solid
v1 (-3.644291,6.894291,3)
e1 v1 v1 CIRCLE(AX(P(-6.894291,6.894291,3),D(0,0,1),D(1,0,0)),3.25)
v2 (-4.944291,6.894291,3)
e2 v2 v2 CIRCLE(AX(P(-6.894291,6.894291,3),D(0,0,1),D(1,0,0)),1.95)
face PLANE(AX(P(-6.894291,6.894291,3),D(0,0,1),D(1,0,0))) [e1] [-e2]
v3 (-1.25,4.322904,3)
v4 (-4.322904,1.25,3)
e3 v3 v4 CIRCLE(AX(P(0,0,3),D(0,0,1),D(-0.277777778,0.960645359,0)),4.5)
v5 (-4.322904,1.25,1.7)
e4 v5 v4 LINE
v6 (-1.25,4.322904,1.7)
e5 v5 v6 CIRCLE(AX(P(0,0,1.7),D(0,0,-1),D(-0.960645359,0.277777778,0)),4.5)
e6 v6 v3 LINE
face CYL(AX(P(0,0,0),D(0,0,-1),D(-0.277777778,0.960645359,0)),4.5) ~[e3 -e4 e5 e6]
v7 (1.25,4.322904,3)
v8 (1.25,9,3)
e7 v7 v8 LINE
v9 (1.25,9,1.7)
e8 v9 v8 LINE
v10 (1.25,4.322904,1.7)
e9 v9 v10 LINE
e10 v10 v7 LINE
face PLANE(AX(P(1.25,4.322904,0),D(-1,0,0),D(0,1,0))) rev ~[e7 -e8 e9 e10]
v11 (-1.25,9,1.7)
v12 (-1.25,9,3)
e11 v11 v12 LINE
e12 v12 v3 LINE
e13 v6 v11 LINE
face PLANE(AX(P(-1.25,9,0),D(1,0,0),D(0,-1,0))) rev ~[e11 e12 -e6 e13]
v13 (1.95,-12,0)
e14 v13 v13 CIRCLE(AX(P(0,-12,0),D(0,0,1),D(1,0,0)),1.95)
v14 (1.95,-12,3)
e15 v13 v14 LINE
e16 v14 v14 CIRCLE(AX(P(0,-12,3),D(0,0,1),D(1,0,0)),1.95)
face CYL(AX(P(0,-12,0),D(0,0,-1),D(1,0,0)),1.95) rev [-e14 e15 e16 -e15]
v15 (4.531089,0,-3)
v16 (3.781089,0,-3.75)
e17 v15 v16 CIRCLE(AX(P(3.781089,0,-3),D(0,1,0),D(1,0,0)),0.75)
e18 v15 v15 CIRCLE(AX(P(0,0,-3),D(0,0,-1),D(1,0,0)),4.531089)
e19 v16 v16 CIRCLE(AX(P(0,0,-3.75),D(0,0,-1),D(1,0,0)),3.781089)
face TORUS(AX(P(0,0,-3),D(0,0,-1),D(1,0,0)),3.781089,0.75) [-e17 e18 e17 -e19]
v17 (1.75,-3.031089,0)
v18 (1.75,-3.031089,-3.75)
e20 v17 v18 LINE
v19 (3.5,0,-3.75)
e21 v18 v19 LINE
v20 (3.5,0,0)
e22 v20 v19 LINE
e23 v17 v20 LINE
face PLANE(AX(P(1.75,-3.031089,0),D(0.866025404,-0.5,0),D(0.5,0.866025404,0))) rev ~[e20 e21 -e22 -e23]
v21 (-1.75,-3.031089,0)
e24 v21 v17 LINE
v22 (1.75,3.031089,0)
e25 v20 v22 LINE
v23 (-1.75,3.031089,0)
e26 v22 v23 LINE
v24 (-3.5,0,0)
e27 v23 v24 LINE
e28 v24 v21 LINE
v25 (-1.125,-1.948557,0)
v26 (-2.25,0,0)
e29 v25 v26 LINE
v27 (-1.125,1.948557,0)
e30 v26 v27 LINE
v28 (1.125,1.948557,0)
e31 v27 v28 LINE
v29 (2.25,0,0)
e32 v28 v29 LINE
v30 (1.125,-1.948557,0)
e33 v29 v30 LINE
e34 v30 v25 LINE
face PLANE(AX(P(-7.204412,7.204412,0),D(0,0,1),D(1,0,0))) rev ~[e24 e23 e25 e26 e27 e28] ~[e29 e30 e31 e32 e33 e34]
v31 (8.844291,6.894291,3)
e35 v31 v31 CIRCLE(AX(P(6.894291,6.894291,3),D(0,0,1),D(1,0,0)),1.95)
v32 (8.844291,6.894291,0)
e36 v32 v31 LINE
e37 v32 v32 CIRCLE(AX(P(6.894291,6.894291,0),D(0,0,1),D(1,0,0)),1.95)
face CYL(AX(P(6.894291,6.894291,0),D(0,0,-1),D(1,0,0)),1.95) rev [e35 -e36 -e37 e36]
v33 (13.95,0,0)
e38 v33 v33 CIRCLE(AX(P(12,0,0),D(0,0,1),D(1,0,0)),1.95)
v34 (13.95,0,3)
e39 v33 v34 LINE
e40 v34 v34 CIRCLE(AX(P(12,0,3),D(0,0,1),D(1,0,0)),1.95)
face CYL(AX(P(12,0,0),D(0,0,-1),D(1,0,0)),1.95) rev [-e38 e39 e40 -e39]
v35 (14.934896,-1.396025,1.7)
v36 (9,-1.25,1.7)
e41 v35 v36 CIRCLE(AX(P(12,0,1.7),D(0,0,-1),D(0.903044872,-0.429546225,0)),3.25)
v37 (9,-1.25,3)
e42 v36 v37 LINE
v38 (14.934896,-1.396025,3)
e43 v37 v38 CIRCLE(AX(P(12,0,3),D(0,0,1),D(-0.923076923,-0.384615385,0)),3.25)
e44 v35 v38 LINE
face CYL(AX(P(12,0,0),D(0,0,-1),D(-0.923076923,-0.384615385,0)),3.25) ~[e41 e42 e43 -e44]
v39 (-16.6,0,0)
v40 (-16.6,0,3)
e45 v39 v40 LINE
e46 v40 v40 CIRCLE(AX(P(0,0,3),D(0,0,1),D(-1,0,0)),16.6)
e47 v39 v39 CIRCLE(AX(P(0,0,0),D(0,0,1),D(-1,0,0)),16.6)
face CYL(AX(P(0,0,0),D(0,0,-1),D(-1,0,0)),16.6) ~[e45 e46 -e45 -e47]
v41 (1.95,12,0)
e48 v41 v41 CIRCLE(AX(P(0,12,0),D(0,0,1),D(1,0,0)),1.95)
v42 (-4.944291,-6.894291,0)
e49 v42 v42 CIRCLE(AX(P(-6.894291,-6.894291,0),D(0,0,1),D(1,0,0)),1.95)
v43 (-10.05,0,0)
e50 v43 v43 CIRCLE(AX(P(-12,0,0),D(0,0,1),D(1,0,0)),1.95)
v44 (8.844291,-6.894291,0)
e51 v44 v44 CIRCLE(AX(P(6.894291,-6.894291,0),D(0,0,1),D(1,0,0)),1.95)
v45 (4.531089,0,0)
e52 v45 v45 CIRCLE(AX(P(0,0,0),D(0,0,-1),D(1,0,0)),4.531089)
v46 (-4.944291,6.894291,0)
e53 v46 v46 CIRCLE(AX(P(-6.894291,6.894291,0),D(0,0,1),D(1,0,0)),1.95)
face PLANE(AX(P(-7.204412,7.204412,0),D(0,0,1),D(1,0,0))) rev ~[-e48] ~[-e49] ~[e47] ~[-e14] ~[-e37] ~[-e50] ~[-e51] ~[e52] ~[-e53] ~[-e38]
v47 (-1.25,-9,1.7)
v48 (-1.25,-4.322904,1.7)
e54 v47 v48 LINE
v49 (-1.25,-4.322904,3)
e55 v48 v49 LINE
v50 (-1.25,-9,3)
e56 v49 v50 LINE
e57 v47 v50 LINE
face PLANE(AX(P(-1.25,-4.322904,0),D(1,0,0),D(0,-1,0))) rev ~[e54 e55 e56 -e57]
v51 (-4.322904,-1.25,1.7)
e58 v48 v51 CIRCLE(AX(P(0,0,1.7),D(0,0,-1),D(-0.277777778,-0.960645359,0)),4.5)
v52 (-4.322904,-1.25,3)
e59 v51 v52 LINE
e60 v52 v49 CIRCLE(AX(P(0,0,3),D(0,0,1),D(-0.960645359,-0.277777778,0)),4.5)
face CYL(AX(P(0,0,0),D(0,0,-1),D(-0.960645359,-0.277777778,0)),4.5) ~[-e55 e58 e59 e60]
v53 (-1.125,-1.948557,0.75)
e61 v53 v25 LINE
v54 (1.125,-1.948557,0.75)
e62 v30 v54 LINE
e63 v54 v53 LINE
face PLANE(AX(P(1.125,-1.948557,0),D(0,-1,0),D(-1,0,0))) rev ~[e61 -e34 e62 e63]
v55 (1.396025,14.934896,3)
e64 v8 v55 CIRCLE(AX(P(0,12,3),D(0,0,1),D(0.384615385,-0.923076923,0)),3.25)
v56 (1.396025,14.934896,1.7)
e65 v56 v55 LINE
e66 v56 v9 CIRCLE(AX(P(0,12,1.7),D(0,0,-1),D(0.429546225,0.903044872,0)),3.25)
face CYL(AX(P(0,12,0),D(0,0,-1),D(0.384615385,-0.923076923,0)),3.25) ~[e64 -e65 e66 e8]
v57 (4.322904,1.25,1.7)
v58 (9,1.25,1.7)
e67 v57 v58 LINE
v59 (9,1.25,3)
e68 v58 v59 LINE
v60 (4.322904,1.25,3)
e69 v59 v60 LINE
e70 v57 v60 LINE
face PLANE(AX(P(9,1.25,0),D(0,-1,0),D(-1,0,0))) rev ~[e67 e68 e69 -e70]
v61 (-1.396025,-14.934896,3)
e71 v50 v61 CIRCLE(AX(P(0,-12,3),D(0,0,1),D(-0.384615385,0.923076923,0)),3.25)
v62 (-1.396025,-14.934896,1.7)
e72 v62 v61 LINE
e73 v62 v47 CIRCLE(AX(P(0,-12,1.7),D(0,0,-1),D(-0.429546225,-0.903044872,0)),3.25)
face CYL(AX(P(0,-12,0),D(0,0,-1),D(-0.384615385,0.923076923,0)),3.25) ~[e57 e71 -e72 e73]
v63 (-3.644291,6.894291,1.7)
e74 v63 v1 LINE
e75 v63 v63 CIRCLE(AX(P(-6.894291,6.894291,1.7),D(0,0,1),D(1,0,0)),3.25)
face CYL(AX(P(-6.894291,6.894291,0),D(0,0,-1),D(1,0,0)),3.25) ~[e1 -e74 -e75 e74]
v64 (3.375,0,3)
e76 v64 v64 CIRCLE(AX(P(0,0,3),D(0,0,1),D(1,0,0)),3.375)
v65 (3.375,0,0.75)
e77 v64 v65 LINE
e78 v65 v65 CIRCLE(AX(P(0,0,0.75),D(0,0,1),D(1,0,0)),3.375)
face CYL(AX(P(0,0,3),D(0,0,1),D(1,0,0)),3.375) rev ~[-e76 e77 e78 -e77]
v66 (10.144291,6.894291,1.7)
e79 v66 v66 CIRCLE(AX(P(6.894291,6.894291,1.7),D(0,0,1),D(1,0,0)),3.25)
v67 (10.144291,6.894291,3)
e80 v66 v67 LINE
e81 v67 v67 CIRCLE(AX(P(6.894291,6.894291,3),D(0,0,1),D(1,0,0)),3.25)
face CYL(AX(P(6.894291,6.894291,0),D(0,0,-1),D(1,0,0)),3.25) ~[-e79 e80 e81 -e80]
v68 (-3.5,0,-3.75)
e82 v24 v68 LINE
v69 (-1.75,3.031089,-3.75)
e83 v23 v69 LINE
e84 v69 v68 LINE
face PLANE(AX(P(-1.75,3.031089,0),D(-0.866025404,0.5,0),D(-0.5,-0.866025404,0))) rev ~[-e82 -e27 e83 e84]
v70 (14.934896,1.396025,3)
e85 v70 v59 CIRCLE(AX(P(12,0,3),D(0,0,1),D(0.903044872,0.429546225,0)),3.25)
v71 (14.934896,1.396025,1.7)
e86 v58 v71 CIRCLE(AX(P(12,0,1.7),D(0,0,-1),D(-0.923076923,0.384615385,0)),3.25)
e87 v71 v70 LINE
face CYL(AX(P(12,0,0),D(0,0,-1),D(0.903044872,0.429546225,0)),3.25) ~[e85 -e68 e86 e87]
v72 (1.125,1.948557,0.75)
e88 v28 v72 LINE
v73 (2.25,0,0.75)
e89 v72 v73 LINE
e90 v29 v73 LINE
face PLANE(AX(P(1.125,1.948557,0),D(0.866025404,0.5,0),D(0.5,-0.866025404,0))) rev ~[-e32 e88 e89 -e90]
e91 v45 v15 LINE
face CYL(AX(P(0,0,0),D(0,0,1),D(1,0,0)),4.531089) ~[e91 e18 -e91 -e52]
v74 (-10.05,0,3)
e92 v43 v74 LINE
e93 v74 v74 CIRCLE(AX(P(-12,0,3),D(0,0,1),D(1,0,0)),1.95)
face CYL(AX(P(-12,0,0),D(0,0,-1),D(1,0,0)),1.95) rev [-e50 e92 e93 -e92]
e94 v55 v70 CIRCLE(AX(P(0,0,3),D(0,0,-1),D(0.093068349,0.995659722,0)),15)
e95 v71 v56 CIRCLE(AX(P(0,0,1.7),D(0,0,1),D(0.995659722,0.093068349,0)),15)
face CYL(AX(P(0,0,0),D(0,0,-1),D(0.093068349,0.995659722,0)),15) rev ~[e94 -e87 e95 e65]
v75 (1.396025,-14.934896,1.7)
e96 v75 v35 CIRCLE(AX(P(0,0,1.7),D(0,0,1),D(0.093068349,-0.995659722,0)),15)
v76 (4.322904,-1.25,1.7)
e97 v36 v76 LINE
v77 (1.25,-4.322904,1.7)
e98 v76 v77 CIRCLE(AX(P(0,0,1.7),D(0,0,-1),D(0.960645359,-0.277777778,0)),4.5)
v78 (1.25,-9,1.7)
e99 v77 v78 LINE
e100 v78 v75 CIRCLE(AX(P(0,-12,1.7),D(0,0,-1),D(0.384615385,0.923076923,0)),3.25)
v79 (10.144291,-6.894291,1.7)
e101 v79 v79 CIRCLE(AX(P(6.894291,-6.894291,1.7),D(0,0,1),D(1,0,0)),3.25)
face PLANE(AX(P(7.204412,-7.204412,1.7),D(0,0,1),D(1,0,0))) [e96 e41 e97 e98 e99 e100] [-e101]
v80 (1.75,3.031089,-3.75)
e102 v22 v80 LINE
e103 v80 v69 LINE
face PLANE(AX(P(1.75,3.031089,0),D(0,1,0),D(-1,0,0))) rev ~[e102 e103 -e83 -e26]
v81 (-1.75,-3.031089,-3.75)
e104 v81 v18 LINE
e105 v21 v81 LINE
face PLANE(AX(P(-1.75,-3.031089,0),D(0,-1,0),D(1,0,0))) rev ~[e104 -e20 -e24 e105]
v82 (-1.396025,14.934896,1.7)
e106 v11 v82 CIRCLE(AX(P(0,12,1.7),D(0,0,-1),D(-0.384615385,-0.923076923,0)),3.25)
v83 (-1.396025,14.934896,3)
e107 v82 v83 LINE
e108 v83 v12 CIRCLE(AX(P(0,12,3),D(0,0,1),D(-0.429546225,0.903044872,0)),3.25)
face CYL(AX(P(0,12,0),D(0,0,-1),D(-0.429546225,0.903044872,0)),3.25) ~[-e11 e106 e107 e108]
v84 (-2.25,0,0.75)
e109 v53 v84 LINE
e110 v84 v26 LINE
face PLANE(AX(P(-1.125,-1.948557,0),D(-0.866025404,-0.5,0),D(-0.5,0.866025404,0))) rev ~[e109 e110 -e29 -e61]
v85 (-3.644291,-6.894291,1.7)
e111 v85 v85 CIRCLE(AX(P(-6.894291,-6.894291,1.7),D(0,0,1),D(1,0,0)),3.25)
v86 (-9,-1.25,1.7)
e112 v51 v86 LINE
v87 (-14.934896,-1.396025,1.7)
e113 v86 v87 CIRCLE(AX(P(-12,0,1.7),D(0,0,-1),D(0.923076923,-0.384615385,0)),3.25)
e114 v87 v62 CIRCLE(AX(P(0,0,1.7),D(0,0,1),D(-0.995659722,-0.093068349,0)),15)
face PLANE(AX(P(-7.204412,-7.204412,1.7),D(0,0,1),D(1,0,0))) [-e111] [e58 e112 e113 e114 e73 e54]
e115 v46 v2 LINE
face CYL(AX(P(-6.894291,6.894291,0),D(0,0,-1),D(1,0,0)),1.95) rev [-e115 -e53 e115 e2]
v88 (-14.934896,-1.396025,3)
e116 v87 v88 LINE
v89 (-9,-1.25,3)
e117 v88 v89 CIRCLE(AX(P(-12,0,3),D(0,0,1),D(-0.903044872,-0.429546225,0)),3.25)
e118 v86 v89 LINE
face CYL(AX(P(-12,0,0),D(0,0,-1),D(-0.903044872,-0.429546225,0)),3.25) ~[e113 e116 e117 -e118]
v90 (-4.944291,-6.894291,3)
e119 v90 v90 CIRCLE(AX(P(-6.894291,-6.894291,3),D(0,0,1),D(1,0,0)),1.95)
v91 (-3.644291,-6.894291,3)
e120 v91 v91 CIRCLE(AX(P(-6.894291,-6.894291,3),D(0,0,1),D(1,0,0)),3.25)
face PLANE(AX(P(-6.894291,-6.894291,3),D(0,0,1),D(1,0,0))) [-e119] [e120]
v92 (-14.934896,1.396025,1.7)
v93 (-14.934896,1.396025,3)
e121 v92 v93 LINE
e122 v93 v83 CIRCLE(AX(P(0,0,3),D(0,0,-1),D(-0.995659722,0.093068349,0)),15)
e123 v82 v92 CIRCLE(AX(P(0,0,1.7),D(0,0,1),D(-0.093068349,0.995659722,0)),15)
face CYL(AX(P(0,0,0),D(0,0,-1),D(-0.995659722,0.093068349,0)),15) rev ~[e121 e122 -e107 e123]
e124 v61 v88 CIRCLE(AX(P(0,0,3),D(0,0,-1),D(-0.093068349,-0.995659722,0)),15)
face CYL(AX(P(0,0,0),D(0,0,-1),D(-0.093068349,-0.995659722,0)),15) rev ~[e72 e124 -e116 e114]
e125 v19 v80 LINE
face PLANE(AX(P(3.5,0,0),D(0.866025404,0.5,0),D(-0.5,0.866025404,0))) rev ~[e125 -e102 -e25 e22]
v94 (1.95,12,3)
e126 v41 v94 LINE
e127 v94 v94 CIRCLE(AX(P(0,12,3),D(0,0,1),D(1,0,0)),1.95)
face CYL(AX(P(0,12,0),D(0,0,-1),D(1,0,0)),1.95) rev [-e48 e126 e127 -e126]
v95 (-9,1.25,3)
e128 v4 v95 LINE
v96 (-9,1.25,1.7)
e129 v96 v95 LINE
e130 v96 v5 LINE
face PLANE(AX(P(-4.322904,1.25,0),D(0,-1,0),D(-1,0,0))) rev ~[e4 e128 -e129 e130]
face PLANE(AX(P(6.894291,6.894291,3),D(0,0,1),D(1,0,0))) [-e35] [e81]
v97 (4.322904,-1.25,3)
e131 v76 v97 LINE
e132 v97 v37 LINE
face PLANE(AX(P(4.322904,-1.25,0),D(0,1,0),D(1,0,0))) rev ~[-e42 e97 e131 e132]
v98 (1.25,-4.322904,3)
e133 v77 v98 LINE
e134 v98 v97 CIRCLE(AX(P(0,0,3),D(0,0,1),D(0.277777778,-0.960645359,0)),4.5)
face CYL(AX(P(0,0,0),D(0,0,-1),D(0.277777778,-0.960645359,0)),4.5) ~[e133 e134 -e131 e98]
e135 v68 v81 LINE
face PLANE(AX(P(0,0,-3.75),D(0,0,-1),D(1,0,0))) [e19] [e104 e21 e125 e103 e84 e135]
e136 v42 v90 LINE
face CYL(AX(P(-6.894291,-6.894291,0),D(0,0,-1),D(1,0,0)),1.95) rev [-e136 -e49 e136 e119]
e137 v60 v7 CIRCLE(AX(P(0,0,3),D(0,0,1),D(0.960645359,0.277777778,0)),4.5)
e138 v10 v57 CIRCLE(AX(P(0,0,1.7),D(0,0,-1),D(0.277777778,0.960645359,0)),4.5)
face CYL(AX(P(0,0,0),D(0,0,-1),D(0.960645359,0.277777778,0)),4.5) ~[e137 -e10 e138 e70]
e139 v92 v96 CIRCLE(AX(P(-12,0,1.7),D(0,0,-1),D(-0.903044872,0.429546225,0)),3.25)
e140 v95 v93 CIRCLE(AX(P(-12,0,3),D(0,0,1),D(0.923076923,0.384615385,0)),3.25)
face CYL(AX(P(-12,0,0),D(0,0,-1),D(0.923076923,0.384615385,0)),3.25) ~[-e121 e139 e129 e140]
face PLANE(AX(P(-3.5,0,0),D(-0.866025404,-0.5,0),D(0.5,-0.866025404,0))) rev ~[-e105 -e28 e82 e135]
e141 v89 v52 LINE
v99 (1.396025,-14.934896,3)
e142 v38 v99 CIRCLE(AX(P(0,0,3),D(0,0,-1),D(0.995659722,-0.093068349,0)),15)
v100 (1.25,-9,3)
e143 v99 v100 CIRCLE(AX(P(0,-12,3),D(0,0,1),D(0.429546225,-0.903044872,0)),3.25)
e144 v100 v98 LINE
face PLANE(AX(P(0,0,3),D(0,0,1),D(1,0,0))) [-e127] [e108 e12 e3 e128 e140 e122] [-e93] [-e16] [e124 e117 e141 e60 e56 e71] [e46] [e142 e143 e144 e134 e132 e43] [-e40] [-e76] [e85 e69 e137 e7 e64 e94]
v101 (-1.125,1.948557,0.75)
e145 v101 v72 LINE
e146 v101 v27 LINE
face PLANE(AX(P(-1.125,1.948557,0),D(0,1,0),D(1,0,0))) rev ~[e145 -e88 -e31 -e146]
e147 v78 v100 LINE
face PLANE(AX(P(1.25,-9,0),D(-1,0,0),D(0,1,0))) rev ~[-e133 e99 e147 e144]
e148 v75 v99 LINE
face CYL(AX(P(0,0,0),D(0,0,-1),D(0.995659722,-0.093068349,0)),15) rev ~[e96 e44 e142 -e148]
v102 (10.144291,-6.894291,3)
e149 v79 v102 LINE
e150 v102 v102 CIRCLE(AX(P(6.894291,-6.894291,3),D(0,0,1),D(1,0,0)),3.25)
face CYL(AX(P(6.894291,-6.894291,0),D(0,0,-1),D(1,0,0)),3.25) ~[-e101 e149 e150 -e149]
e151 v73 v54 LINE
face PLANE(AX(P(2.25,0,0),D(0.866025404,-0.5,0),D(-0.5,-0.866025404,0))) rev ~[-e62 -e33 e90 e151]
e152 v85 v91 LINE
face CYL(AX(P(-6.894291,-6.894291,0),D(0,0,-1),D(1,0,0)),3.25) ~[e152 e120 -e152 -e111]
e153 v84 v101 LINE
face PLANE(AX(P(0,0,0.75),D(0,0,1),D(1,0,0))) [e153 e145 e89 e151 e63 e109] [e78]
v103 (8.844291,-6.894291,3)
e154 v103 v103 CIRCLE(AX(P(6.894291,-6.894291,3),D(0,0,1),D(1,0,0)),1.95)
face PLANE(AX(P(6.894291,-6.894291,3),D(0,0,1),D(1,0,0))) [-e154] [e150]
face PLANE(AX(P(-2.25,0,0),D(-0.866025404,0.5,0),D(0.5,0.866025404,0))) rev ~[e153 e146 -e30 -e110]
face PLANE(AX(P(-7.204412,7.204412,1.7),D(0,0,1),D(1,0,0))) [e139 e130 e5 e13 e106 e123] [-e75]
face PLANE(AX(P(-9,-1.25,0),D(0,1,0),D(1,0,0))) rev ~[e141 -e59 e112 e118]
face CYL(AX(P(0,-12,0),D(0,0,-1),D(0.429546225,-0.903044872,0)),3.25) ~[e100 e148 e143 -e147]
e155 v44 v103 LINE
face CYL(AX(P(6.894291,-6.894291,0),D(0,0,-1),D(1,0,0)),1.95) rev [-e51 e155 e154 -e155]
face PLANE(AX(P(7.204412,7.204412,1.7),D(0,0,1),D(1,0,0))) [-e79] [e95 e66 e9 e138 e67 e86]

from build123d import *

# Parameters (mm, degrees)
F0_R     = 3.375
F0_R_2   = 1.95
F1_DEPTH = 3
F0_R_3   = 3.25
F2_DEPTH = 1.7
F3_DEPTH = 3
F4_R     = 3.375
F5_DEPTH = 2.25
F6_R     = 4.5310889132
F7_DEPTH = 3.75
F8_R     = 0.75


# Not quite as in the source:
# - a feature names something its author has since deleted; it is built from what else it names


with BuildPart() as f1:
    # F0 (on Top) → F1 (new body)
    with BuildSketch(Plane.XY):
        with BuildLine():
            ThreePointArc((16.6, 0), (0, 16.6), (-16.6, 0))
            ThreePointArc((-16.6, 0), (0, -16.6), (16.6, 0))
        make_face()
        with BuildLine():
            ThreePointArc((14.9348958333, 1.3960252317), (14.9837151184, 0.698771243), (15, 0))
            ThreePointArc((15, 0), (14.9837151184, -0.698771243), (14.9348958333, -1.3960252317))
            ThreePointArc((14.9348958333, -1.3960252317), (10.6066017178, -10.6066017178), (1.3960252317, -14.9348958333))
            ThreePointArc((1.3960252317, -14.9348958333), (0, -15), (-1.3960252317, -14.9348958333))
            ThreePointArc((-1.3960252317, -14.9348958333), (-10.6066017178, -10.6066017178), (-14.9348958333, -1.3960252317))
            ThreePointArc((-14.9348958333, -1.3960252317), (-14.9837151184, -0.698771243), (-15, 0))
            ThreePointArc((-15, 0), (-14.9837151184, 0.698771243), (-14.9348958333, 1.3960252317))
            ThreePointArc((-14.9348958333, 1.3960252317), (-10.6066017178, 10.6066017178), (-1.3960252317, 14.9348958333))
            ThreePointArc((-1.3960252317, 14.9348958333), (0, 15), (1.3960252317, 14.9348958333))
            ThreePointArc((1.3960252317, 14.9348958333), (10.6066017178, 10.6066017178), (14.9348958333, 1.3960252317))
        make_face(mode=Mode.SUBTRACT)
        with BuildLine():
            ThreePointArc((1.25, -4.3229041164), (3.1819805153, -3.1819805153), (4.3229041164, -1.25))
            ThreePointArc((4.3229041164, -1.25), (4.4555060613, -0.6312414261), (4.5, 0))
            ThreePointArc((4.5, 0), (4.4555060613, 0.6312414261), (4.3229041164, 1.25))
            ThreePointArc((4.3229041164, 1.25), (3.1819805153, 3.1819805153), (1.25, 4.3229041164))
            ThreePointArc((1.25, 4.3229041164), (0, 4.5), (-1.25, 4.3229041164))
            ThreePointArc((-1.25, 4.3229041164), (-3.1819805153, 3.1819805153), (-4.3229041164, 1.25))
            ThreePointArc((-4.3229041164, 1.25), (-4.5, 0), (-4.3229041164, -1.25))
            ThreePointArc((-4.3229041164, -1.25), (-3.1819805153, -3.1819805153), (-1.25, -4.3229041164))
            ThreePointArc((-1.25, -4.3229041164), (0, -4.5), (1.25, -4.3229041164))
        make_face()
        Circle(F0_R, mode=Mode.SUBTRACT)
        Circle(F0_R)
        Polygon((-2.25, 0), (-1.125, 1.9485571585), (1.125, 1.9485571585), (2.25, 0), (1.125, -1.9485571585), (-1.125, -1.9485571585), align=None, mode=Mode.SUBTRACT)
        with BuildLine():
            ThreePointArc((14.9348958333, -1.3960252317), (14.9837151184, -0.698771243), (15, 0))
            ThreePointArc((15, 0), (14.9837151184, 0.698771243), (14.9348958333, 1.3960252317))
            ThreePointArc((14.9348958333, 1.3960252317), (11.9200595209, 3.2490167004), (9, 1.25))
            ThreePointArc((9, 1.25), (8.75, 0), (9, -1.25))
            ThreePointArc((9, -1.25), (11.9200595209, -3.2490167004), (14.9348958333, -1.3960252317))
        make_face()
        with Locations((12, 0)):
            Circle(F0_R_2, mode=Mode.SUBTRACT)
        with BuildLine():
            ThreePointArc((1.25, 9), (3.2490167004, 11.9200595209), (1.3960252317, 14.9348958333))
            ThreePointArc((1.3960252317, 14.9348958333), (0, 15), (-1.3960252317, 14.9348958333))
            ThreePointArc((-1.3960252317, 14.9348958333), (-3.2490167004, 11.9200595209), (-1.25, 9))
            ThreePointArc((-1.25, 9), (0, 8.75), (1.25, 9))
        make_face()
        with Locations((0, 12)):
            Circle(F0_R_2, mode=Mode.SUBTRACT)
        with BuildLine():
            ThreePointArc((-1.3960252317, -14.9348958333), (0, -15), (1.3960252317, -14.9348958333))
            ThreePointArc((1.3960252317, -14.9348958333), (3.2490167004, -11.9200595209), (1.25, -9))
            ThreePointArc((1.25, -9), (0, -8.75), (-1.25, -9))
            ThreePointArc((-1.25, -9), (-3.2490167004, -11.9200595209), (-1.3960252317, -14.9348958333))
        make_face()
        with Locations((0, -12)):
            Circle(F0_R_2, mode=Mode.SUBTRACT)
        with BuildLine():
            ThreePointArc((-9, 1.25), (-11.9200595209, 3.2490167004), (-14.9348958333, 1.3960252317))
            ThreePointArc((-14.9348958333, 1.3960252317), (-14.9837151184, 0.698771243), (-15, 0))
            ThreePointArc((-15, 0), (-14.9837151184, -0.698771243), (-14.9348958333, -1.3960252317))
            ThreePointArc((-14.9348958333, -1.3960252317), (-11.9200595209, -3.2490167004), (-9, -1.25))
            ThreePointArc((-9, -1.25), (-8.75, 0), (-9, 1.25))
        make_face()
        with Locations((-12, 0)):
            Circle(F0_R_2, mode=Mode.SUBTRACT)
        with BuildLine():
            ThreePointArc((9, -1.25), (8.75, 0), (9, 1.25))
            Line((9, 1.25), (6, 1.25))
            Line((6, 1.25), (4.3229041164, 1.25))
            ThreePointArc((4.3229041164, 1.25), (4.4555060613, 0.6312414261), (4.5, 0))
            ThreePointArc((4.5, 0), (4.4555060613, -0.6312414261), (4.3229041164, -1.25))
            Line((4.3229041164, -1.25), (9, -1.25))
        make_face()
        with BuildLine():
            Line((1.25, 4.3229041164), (1.25, 9))
            ThreePointArc((1.25, 9), (0, 8.75), (-1.25, 9))
            Line((-1.25, 9), (-1.25, 6))
            Line((-1.25, 6), (-1.25, 4.3229041164))
            ThreePointArc((-1.25, 4.3229041164), (0, 4.5), (1.25, 4.3229041164))
        make_face()
        with BuildLine():
            ThreePointArc((-1.25, -9), (0, -8.75), (1.25, -9))
            Line((1.25, -9), (1.25, -6))
            Line((1.25, -6), (1.25, -4.3229041164))
            ThreePointArc((1.25, -4.3229041164), (0, -4.5), (-1.25, -4.3229041164))
            Line((-1.25, -4.3229041164), (-1.25, -9))
        make_face()
        with BuildLine():
            Line((-4.3229041164, 1.25), (-9, 1.25))
            ThreePointArc((-9, 1.25), (-8.75, 0), (-9, -1.25))
            Line((-9, -1.25), (-6, -1.25))
            Line((-6, -1.25), (-4.3229041164, -1.25))
            ThreePointArc((-4.3229041164, -1.25), (-4.5, 0), (-4.3229041164, 1.25))
        make_face()
    extrude(amount=F1_DEPTH)



with BuildPart() as f1b:
    # F0 (on Top) → F1, piece 2 (new body)
    with BuildSketch(Plane.XY):
        with Locations((6.8942911166, 6.8942911166)):
            Circle(F0_R_3)
        with Locations((6.8942911166, 6.8942911166)):
            Circle(F0_R_2, mode=Mode.SUBTRACT)
    extrude(amount=F1_DEPTH)


with BuildPart() as f1c:
    # F0 (on Top) → F1, piece 3 (new body)
    with BuildSketch(Plane.XY):
        with Locations((-6.8942911166, 6.8942911166)):
            Circle(F0_R_3)
        with Locations((-6.8942911166, 6.8942911166)):
            Circle(F0_R_2, mode=Mode.SUBTRACT)
    extrude(amount=F1_DEPTH)


with BuildPart() as f1d:
    # F0 (on Top) → F1, piece 4 (new body)
    with BuildSketch(Plane.XY):
        with Locations((-6.8942911166, -6.8942911166)):
            Circle(F0_R_3)
        with Locations((-6.8942911166, -6.8942911166)):
            Circle(F0_R_2, mode=Mode.SUBTRACT)
    extrude(amount=F1_DEPTH)


with BuildPart() as f1e:
    # F0 (on Top) → F1, piece 5 (new body)
    with BuildSketch(Plane.XY):
        with Locations((6.8942911166, -6.8942911166)):
            Circle(F0_R_3)
        with Locations((6.8942911166, -6.8942911166)):
            Circle(F0_R_2, mode=Mode.SUBTRACT)
    extrude(amount=F1_DEPTH)


with BuildPart() as f1_1:
    add(f1.part)

    add(f1b.part)  # F2 merges F1b

    add(f1c.part)  # F2 merges F1c

    add(f1d.part)  # F2 merges F1d

    add(f1e.part)  # F2 merges F1e
    # F0 (on Top) → F2 (join)
    with BuildSketch(Plane.XY):
        with BuildLine():
            ThreePointArc((-1.25, 9), (-3.2490167004, 11.9200595209), (-1.3960252317, 14.9348958333))
            ThreePointArc((-1.3960252317, 14.9348958333), (-10.6066017178, 10.6066017178), (-14.9348958333, 1.3960252317))
            ThreePointArc((-14.9348958333, 1.3960252317), (-11.9200595209, 3.2490167004), (-9, 1.25))
            Line((-9, 1.25), (-4.3229041164, 1.25))
            ThreePointArc((-4.3229041164, 1.25), (-3.1819805153, 3.1819805153), (-1.25, 4.3229041164))
            Line((-1.25, 4.3229041164), (-1.25, 6))
            Line((-1.25, 6), (-1.25, 9))
        make_face()
        with Locations((-6.8942911166, 6.8942911166)):
            Circle(F0_R_3, mode=Mode.SUBTRACT)
        with BuildLine():
            ThreePointArc((9, 1.25), (11.9200595209, 3.2490167004), (14.9348958333, 1.3960252317))
            ThreePointArc((14.9348958333, 1.3960252317), (10.6066017178, 10.6066017178), (1.3960252317, 14.9348958333))
            ThreePointArc((1.3960252317, 14.9348958333), (3.2490167004, 11.9200595209), (1.25, 9))
            Line((1.25, 9), (1.25, 4.3229041164))
            ThreePointArc((1.25, 4.3229041164), (3.1819805153, 3.1819805153), (4.3229041164, 1.25))
            Line((4.3229041164, 1.25), (6, 1.25))
            Line((6, 1.25), (9, 1.25))
        make_face()
        with Locations((6.8942911166, 6.8942911166)):
            Circle(F0_R_3, mode=Mode.SUBTRACT)
        with BuildLine():
            ThreePointArc((1.3960252317, -14.9348958333), (10.6066017178, -10.6066017178), (14.9348958333, -1.3960252317))
            ThreePointArc((14.9348958333, -1.3960252317), (11.9200595209, -3.2490167004), (9, -1.25))
            Line((9, -1.25), (4.3229041164, -1.25))
            ThreePointArc((4.3229041164, -1.25), (3.1819805153, -3.1819805153), (1.25, -4.3229041164))
            Line((1.25, -4.3229041164), (1.25, -6))
            Line((1.25, -6), (1.25, -9))
            ThreePointArc((1.25, -9), (3.2490167004, -11.9200595209), (1.3960252317, -14.9348958333))
        make_face()
        with Locations((6.8942911166, -6.8942911166)):
            Circle(F0_R_3, mode=Mode.SUBTRACT)
        with BuildLine():
            ThreePointArc((-14.9348958333, -1.3960252317), (-10.6066017178, -10.6066017178), (-1.3960252317, -14.9348958333))
            ThreePointArc((-1.3960252317, -14.9348958333), (-3.2490167004, -11.9200595209), (-1.25, -9))
            Line((-1.25, -9), (-1.25, -4.3229041164))
            ThreePointArc((-1.25, -4.3229041164), (-3.1819805153, -3.1819805153), (-4.3229041164, -1.25))
            Line((-4.3229041164, -1.25), (-6, -1.25))
            Line((-6, -1.25), (-9, -1.25))
            ThreePointArc((-9, -1.25), (-11.9200595209, -3.2490167004), (-14.9348958333, -1.3960252317))
        make_face()
        with Locations((-6.8942911166, -6.8942911166)):
            Circle(F0_R_3, mode=Mode.SUBTRACT)
        Circle(F0_R)
        Polygon((-2.25, 0), (-1.125, 1.9485571585), (1.125, 1.9485571585), (2.25, 0), (1.125, -1.9485571585), (-1.125, -1.9485571585), align=None, mode=Mode.SUBTRACT)
    extrude(amount=F2_DEPTH)

    # F0 (on Top) → F3 (join)
    with BuildSketch(Plane.XY):
        with BuildLine():
            ThreePointArc((16.6, 0), (0, 16.6), (-16.6, 0))
            ThreePointArc((-16.6, 0), (0, -16.6), (16.6, 0))
        make_face()
        with BuildLine():
            ThreePointArc((14.9348958333, 1.3960252317), (14.9837151184, 0.698771243), (15, 0))
            ThreePointArc((15, 0), (14.9837151184, -0.698771243), (14.9348958333, -1.3960252317))
            ThreePointArc((14.9348958333, -1.3960252317), (10.6066017178, -10.6066017178), (1.3960252317, -14.9348958333))
            ThreePointArc((1.3960252317, -14.9348958333), (0, -15), (-1.3960252317, -14.9348958333))
            ThreePointArc((-1.3960252317, -14.9348958333), (-10.6066017178, -10.6066017178), (-14.9348958333, -1.3960252317))
            ThreePointArc((-14.9348958333, -1.3960252317), (-14.9837151184, -0.698771243), (-15, 0))
            ThreePointArc((-15, 0), (-14.9837151184, 0.698771243), (-14.9348958333, 1.3960252317))
            ThreePointArc((-14.9348958333, 1.3960252317), (-10.6066017178, 10.6066017178), (-1.3960252317, 14.9348958333))
            ThreePointArc((-1.3960252317, 14.9348958333), (0, 15), (1.3960252317, 14.9348958333))
            ThreePointArc((1.3960252317, 14.9348958333), (10.6066017178, 10.6066017178), (14.9348958333, 1.3960252317))
        make_face(mode=Mode.SUBTRACT)
    extrude(amount=F3_DEPTH)

    # F4 (on face) → F5 (cut)
    with BuildSketch(Plane.XY.offset(3)):
        Circle(F4_R)
        Polygon((-1.125, 1.9485571585), (1.125, 1.9485571585), (2.25, 0), (1.125, -1.9485571585), (-1.125, -1.9485571585), (-2.25, 0), align=None, mode=Mode.SUBTRACT)
    extrude(amount=-F5_DEPTH, mode=Mode.SUBTRACT)

    # F6 (on face) → F7 (join)
    with BuildSketch(Plane(origin=(0, 0, 0), x_dir=(1, 0, 0), z_dir=(0, 0, -1))):
        Circle(F6_R)
        Polygon((-3.5, 0), (-1.75, 3.0310889132), (1.75, 3.0310889132), (3.5, 0), (1.75, -3.0310889132), (-1.75, -3.0310889132), align=None, mode=Mode.SUBTRACT)
    extrude(amount=F7_DEPTH)

    # F8
    f8_edges = [f1_1.edges().sort_by_distance(p)[0] for p in [
        (-4.531089, 0, -3.75),
    ]]
    fillet(f8_edges, radius=F8_R)


solid = f1_1.part
